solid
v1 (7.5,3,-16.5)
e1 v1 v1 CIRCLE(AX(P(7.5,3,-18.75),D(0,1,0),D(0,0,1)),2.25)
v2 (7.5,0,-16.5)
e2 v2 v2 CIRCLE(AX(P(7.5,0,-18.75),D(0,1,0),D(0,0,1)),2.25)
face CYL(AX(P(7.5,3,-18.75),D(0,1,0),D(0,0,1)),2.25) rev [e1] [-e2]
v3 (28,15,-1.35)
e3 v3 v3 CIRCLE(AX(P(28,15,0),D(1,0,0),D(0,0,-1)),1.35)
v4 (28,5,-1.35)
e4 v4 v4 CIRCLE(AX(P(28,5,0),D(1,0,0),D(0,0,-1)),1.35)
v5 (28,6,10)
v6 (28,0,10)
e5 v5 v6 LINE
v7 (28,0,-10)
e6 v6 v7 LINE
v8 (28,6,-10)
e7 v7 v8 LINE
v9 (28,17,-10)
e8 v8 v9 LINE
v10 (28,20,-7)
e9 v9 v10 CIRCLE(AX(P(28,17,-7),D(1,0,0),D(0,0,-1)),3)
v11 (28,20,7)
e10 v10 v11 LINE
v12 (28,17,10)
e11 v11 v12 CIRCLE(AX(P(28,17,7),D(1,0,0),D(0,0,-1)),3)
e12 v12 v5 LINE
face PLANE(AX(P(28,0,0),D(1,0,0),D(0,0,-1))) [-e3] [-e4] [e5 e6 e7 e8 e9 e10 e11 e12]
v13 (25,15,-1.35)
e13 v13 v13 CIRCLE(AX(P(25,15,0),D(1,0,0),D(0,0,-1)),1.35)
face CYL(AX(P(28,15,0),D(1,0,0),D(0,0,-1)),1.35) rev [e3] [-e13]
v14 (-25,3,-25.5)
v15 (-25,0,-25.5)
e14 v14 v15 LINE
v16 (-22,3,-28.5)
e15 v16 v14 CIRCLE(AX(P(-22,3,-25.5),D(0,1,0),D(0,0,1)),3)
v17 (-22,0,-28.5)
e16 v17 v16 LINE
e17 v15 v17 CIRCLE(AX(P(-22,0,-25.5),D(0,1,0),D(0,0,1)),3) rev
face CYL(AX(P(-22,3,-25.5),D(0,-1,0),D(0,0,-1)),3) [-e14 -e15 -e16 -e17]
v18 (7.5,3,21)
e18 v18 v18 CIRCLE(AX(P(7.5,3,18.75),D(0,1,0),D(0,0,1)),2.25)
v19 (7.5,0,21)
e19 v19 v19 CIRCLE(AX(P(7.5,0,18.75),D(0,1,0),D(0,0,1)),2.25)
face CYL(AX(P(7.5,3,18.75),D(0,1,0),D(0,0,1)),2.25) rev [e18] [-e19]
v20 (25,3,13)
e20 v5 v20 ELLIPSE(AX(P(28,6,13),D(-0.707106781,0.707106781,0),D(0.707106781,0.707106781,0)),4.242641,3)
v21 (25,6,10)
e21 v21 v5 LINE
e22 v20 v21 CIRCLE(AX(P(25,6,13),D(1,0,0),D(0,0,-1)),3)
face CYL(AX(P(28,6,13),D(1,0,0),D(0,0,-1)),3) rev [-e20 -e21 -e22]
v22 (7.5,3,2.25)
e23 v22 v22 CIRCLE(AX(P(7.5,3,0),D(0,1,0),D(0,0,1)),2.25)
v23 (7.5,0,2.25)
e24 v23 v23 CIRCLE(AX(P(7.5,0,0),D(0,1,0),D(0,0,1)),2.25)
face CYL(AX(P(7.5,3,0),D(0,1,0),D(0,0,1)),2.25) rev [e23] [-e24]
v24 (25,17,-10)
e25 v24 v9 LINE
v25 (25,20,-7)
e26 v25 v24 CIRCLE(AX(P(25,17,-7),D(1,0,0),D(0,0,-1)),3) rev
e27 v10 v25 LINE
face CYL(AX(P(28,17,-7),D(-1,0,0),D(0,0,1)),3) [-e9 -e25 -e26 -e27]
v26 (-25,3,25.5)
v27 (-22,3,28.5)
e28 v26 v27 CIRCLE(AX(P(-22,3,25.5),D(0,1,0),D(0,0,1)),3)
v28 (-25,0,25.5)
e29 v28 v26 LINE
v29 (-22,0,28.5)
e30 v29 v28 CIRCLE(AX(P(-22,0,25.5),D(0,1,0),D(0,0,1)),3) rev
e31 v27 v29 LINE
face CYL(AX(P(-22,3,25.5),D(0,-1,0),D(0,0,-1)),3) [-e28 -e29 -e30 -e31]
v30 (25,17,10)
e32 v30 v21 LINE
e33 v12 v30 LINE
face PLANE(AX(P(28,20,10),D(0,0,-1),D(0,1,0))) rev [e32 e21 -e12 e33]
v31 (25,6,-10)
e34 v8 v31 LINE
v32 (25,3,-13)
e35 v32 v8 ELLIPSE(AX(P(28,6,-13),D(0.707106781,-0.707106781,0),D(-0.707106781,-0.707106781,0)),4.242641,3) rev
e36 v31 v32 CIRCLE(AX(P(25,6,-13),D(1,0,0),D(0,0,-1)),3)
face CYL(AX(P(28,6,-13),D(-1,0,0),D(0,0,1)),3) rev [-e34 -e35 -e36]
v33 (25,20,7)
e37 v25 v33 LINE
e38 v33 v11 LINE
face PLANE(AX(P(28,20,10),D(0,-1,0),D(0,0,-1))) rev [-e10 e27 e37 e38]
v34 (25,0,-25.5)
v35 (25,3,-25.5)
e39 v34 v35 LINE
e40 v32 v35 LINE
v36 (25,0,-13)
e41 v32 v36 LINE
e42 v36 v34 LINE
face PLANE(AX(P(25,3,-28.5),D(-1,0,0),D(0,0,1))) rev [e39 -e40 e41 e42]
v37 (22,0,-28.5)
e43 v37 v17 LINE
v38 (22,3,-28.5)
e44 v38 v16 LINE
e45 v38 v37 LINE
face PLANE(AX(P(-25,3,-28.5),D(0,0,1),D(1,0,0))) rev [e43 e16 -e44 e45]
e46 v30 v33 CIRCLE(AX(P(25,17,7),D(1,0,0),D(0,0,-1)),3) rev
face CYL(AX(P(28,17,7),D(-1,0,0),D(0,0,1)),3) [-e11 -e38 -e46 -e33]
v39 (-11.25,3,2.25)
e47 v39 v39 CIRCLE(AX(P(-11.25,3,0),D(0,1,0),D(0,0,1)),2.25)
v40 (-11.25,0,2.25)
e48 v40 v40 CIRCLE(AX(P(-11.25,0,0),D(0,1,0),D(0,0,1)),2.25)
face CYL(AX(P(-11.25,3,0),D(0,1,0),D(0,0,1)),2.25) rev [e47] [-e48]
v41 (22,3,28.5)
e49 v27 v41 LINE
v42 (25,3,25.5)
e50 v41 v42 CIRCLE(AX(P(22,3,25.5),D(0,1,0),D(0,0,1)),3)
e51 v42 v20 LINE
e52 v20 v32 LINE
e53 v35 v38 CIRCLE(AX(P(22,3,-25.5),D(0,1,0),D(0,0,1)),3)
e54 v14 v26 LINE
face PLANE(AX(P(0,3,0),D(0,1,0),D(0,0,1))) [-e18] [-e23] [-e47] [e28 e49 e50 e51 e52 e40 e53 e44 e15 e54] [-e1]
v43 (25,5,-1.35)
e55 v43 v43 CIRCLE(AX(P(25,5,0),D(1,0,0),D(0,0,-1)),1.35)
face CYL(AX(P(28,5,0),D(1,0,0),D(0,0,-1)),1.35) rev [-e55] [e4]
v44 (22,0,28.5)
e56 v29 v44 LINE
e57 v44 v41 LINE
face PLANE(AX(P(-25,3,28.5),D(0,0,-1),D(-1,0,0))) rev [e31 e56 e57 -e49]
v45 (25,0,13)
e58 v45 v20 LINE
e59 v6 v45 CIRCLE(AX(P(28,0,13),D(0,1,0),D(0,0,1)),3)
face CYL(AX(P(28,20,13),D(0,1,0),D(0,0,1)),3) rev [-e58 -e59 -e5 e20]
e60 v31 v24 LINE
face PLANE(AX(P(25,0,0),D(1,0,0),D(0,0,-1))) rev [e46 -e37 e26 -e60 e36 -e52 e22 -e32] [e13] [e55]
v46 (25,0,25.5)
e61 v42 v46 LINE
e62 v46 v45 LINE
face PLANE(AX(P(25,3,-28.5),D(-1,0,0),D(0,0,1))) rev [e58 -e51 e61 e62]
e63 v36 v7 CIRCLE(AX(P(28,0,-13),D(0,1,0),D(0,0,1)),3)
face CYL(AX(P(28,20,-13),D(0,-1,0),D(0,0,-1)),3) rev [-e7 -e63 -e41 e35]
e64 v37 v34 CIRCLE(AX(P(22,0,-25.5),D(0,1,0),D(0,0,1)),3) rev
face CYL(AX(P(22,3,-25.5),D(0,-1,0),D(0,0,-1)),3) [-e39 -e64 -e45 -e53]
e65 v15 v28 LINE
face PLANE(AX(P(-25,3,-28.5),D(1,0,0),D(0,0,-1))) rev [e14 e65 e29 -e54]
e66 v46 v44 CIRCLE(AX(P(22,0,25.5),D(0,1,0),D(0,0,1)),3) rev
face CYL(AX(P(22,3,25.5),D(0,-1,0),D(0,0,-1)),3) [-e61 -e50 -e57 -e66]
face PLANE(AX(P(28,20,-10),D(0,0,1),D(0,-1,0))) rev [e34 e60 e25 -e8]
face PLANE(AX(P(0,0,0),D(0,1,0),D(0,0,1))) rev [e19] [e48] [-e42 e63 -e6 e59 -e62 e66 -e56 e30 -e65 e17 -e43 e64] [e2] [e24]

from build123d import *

# Parameters (mm, degrees)
SKETCH1_W                      = 50
SKETCH1_H                      = 57
BOSS_EXTRUDE1_DEPTH            = 3
F_4_5_4_5_DIAMETER_HOLE1_D     = 4.5
F_4_5_4_5_DIAMETER_HOLE1_DEPTH = 15
F_4_5_4_5_DIAMETER_HOLE1_TIP   = 1.351936393
SKETCH4_W                      = 20
SKETCH4_H                      = 20
BOSS_EXTRUDE2_DEPTH            = 3
F_2_7_2_7_DIAMETER_HOLE1_D     = 2.7
F_2_7_2_7_DIAMETER_HOLE1_DEPTH = 15
F_2_7_2_7_DIAMETER_HOLE1_TIP   = 0.811161836
FILLET1_R                      = 3
FILLET2_R                      = 3


# Some blends are built 0.0001 mm under size
with BuildPart() as part:
    # Sketch1 → Boss-Extrude1 (new body)
    with BuildSketch(Plane(origin=(0, 0, 0), x_dir=(1, 0, 0), z_dir=(0, 1, 0))):
        Rectangle(SKETCH1_W, SKETCH1_H)
    extrude(amount=BOSS_EXTRUDE1_DEPTH)

    # Ø4.5 (4.5) Diameter Hole1
    with Locations(Plane(origin=(0, 3, 0), x_dir=(1, 0, 0), z_dir=(0, 1, 0))):
        with Locations((-11.25, 0), (7.5, 0), (7.5, 18.75), (7.5, -18.75)):
            Hole(F_4_5_4_5_DIAMETER_HOLE1_D / 2, depth=F_4_5_4_5_DIAMETER_HOLE1_DEPTH)
            with Locations((0, 0, -(F_4_5_4_5_DIAMETER_HOLE1_DEPTH + F_4_5_4_5_DIAMETER_HOLE1_TIP / 2))):  # 118° drill point
                Cone(0, F_4_5_4_5_DIAMETER_HOLE1_D / 2, F_4_5_4_5_DIAMETER_HOLE1_TIP, mode=Mode.SUBTRACT)

    # Sketch4 → Boss-Extrude2 (add)
    with BuildSketch(Plane(origin=(25, 0, 0), x_dir=(0, 0, -1), z_dir=(1, 0, 0))):
        with Locations((0, 10)):
            Rectangle(SKETCH4_W, SKETCH4_H)
    extrude(amount=BOSS_EXTRUDE2_DEPTH)

    # Ø2.7 (2.7) Diameter Hole1
    with Locations(Plane(origin=(28, 0, 0), x_dir=(0, 0, -1), z_dir=(1, 0, 0))):
        with Locations((0, 5), (0, 15)):
            Hole(F_2_7_2_7_DIAMETER_HOLE1_D / 2, depth=F_2_7_2_7_DIAMETER_HOLE1_DEPTH)
            with Locations((0, 0, -(F_2_7_2_7_DIAMETER_HOLE1_DEPTH + F_2_7_2_7_DIAMETER_HOLE1_TIP / 2))):  # 118° drill point
                Cone(0, F_2_7_2_7_DIAMETER_HOLE1_D / 2, F_2_7_2_7_DIAMETER_HOLE1_TIP, mode=Mode.SUBTRACT)

    # Fillet1
    fillet1_edges = [part.edges().sort_by_distance(p)[0] for p in [
        (-25, 1.5, 28.5),
        (-25, 1.5, -28.5),
        (25, 1.5, -28.5),
        (25, 1.5, -10),
        (25, 1.5, 28.5),
        (25, 1.5, 10),
        (26.5, 20, -10),
        (26.5, 20, 10),
    ]]
    fillet(fillet1_edges, radius=FILLET1_R - 0.0001)  # a hair under: the kernel refuses the full size

    # Fillet2
    # the kernel refuses this fillet: 3 mm, written as the material it adds along each edge
    with BuildSketch(Plane(origin=(25, 3, 10), x_dir=(0, 0, 1), z_dir=(1, 0, 0))) as fillet2_piece_1_section:
        with BuildLine():
            CenterArc((FILLET2_R, -FILLET2_R), FILLET2_R, 90, 90)
            Line((0, -FILLET2_R), (0, 0))
            Line((0, 0), (FILLET2_R, 0))
        make_face()
    fillet2_piece_1 = extrude(amount=10.4999, mode=Mode.PRIVATE)
    fillet2_piece_1 = split(fillet2_piece_1, bisect_by=Plane(origin=(28, 3.856738297, 10.392281227), z_dir=(-1, 0, 0)), keep=Keep.TOP, mode=Mode.PRIVATE)
    fillet2_piece_1 = fillet2_piece_1 - Plane(origin=(27.9999, 3.856738297, 12.9999), x_dir=(0, 0, -1), z_dir=(0, 1, 0)) * Cylinder(2.9999, 33, mode=Mode.PRIVATE)
    add(fillet2_piece_1)
    with BuildSketch(Plane(origin=(25, 3, -10), x_dir=(0, 0, -1), z_dir=(1, 0, 0))) as fillet2_piece_2_section:
        with BuildLine():
            CenterArc((FILLET2_R, FILLET2_R), FILLET2_R, 180, 90)
            Line((0, FILLET2_R), (0, 0))
            Line((0, 0), (FILLET2_R, 0))
        make_face()
    fillet2_piece_2 = extrude(amount=10.4999, mode=Mode.PRIVATE)
    fillet2_piece_2 = fillet2_piece_2 - Plane(origin=(27.9999, 3.856737678, -12.9999), x_dir=(-1, 0, 0), z_dir=(0, -1, 0)) * Cylinder(2.9999, 33, mode=Mode.PRIVATE)
    fillet2_piece_2 = split(fillet2_piece_2, bisect_by=Plane(origin=(28, 3.856737678, -10.392309052), z_dir=(-1, 0, 0)), keep=Keep.TOP, mode=Mode.PRIVATE)
    add(fillet2_piece_2)


solid = part.part
